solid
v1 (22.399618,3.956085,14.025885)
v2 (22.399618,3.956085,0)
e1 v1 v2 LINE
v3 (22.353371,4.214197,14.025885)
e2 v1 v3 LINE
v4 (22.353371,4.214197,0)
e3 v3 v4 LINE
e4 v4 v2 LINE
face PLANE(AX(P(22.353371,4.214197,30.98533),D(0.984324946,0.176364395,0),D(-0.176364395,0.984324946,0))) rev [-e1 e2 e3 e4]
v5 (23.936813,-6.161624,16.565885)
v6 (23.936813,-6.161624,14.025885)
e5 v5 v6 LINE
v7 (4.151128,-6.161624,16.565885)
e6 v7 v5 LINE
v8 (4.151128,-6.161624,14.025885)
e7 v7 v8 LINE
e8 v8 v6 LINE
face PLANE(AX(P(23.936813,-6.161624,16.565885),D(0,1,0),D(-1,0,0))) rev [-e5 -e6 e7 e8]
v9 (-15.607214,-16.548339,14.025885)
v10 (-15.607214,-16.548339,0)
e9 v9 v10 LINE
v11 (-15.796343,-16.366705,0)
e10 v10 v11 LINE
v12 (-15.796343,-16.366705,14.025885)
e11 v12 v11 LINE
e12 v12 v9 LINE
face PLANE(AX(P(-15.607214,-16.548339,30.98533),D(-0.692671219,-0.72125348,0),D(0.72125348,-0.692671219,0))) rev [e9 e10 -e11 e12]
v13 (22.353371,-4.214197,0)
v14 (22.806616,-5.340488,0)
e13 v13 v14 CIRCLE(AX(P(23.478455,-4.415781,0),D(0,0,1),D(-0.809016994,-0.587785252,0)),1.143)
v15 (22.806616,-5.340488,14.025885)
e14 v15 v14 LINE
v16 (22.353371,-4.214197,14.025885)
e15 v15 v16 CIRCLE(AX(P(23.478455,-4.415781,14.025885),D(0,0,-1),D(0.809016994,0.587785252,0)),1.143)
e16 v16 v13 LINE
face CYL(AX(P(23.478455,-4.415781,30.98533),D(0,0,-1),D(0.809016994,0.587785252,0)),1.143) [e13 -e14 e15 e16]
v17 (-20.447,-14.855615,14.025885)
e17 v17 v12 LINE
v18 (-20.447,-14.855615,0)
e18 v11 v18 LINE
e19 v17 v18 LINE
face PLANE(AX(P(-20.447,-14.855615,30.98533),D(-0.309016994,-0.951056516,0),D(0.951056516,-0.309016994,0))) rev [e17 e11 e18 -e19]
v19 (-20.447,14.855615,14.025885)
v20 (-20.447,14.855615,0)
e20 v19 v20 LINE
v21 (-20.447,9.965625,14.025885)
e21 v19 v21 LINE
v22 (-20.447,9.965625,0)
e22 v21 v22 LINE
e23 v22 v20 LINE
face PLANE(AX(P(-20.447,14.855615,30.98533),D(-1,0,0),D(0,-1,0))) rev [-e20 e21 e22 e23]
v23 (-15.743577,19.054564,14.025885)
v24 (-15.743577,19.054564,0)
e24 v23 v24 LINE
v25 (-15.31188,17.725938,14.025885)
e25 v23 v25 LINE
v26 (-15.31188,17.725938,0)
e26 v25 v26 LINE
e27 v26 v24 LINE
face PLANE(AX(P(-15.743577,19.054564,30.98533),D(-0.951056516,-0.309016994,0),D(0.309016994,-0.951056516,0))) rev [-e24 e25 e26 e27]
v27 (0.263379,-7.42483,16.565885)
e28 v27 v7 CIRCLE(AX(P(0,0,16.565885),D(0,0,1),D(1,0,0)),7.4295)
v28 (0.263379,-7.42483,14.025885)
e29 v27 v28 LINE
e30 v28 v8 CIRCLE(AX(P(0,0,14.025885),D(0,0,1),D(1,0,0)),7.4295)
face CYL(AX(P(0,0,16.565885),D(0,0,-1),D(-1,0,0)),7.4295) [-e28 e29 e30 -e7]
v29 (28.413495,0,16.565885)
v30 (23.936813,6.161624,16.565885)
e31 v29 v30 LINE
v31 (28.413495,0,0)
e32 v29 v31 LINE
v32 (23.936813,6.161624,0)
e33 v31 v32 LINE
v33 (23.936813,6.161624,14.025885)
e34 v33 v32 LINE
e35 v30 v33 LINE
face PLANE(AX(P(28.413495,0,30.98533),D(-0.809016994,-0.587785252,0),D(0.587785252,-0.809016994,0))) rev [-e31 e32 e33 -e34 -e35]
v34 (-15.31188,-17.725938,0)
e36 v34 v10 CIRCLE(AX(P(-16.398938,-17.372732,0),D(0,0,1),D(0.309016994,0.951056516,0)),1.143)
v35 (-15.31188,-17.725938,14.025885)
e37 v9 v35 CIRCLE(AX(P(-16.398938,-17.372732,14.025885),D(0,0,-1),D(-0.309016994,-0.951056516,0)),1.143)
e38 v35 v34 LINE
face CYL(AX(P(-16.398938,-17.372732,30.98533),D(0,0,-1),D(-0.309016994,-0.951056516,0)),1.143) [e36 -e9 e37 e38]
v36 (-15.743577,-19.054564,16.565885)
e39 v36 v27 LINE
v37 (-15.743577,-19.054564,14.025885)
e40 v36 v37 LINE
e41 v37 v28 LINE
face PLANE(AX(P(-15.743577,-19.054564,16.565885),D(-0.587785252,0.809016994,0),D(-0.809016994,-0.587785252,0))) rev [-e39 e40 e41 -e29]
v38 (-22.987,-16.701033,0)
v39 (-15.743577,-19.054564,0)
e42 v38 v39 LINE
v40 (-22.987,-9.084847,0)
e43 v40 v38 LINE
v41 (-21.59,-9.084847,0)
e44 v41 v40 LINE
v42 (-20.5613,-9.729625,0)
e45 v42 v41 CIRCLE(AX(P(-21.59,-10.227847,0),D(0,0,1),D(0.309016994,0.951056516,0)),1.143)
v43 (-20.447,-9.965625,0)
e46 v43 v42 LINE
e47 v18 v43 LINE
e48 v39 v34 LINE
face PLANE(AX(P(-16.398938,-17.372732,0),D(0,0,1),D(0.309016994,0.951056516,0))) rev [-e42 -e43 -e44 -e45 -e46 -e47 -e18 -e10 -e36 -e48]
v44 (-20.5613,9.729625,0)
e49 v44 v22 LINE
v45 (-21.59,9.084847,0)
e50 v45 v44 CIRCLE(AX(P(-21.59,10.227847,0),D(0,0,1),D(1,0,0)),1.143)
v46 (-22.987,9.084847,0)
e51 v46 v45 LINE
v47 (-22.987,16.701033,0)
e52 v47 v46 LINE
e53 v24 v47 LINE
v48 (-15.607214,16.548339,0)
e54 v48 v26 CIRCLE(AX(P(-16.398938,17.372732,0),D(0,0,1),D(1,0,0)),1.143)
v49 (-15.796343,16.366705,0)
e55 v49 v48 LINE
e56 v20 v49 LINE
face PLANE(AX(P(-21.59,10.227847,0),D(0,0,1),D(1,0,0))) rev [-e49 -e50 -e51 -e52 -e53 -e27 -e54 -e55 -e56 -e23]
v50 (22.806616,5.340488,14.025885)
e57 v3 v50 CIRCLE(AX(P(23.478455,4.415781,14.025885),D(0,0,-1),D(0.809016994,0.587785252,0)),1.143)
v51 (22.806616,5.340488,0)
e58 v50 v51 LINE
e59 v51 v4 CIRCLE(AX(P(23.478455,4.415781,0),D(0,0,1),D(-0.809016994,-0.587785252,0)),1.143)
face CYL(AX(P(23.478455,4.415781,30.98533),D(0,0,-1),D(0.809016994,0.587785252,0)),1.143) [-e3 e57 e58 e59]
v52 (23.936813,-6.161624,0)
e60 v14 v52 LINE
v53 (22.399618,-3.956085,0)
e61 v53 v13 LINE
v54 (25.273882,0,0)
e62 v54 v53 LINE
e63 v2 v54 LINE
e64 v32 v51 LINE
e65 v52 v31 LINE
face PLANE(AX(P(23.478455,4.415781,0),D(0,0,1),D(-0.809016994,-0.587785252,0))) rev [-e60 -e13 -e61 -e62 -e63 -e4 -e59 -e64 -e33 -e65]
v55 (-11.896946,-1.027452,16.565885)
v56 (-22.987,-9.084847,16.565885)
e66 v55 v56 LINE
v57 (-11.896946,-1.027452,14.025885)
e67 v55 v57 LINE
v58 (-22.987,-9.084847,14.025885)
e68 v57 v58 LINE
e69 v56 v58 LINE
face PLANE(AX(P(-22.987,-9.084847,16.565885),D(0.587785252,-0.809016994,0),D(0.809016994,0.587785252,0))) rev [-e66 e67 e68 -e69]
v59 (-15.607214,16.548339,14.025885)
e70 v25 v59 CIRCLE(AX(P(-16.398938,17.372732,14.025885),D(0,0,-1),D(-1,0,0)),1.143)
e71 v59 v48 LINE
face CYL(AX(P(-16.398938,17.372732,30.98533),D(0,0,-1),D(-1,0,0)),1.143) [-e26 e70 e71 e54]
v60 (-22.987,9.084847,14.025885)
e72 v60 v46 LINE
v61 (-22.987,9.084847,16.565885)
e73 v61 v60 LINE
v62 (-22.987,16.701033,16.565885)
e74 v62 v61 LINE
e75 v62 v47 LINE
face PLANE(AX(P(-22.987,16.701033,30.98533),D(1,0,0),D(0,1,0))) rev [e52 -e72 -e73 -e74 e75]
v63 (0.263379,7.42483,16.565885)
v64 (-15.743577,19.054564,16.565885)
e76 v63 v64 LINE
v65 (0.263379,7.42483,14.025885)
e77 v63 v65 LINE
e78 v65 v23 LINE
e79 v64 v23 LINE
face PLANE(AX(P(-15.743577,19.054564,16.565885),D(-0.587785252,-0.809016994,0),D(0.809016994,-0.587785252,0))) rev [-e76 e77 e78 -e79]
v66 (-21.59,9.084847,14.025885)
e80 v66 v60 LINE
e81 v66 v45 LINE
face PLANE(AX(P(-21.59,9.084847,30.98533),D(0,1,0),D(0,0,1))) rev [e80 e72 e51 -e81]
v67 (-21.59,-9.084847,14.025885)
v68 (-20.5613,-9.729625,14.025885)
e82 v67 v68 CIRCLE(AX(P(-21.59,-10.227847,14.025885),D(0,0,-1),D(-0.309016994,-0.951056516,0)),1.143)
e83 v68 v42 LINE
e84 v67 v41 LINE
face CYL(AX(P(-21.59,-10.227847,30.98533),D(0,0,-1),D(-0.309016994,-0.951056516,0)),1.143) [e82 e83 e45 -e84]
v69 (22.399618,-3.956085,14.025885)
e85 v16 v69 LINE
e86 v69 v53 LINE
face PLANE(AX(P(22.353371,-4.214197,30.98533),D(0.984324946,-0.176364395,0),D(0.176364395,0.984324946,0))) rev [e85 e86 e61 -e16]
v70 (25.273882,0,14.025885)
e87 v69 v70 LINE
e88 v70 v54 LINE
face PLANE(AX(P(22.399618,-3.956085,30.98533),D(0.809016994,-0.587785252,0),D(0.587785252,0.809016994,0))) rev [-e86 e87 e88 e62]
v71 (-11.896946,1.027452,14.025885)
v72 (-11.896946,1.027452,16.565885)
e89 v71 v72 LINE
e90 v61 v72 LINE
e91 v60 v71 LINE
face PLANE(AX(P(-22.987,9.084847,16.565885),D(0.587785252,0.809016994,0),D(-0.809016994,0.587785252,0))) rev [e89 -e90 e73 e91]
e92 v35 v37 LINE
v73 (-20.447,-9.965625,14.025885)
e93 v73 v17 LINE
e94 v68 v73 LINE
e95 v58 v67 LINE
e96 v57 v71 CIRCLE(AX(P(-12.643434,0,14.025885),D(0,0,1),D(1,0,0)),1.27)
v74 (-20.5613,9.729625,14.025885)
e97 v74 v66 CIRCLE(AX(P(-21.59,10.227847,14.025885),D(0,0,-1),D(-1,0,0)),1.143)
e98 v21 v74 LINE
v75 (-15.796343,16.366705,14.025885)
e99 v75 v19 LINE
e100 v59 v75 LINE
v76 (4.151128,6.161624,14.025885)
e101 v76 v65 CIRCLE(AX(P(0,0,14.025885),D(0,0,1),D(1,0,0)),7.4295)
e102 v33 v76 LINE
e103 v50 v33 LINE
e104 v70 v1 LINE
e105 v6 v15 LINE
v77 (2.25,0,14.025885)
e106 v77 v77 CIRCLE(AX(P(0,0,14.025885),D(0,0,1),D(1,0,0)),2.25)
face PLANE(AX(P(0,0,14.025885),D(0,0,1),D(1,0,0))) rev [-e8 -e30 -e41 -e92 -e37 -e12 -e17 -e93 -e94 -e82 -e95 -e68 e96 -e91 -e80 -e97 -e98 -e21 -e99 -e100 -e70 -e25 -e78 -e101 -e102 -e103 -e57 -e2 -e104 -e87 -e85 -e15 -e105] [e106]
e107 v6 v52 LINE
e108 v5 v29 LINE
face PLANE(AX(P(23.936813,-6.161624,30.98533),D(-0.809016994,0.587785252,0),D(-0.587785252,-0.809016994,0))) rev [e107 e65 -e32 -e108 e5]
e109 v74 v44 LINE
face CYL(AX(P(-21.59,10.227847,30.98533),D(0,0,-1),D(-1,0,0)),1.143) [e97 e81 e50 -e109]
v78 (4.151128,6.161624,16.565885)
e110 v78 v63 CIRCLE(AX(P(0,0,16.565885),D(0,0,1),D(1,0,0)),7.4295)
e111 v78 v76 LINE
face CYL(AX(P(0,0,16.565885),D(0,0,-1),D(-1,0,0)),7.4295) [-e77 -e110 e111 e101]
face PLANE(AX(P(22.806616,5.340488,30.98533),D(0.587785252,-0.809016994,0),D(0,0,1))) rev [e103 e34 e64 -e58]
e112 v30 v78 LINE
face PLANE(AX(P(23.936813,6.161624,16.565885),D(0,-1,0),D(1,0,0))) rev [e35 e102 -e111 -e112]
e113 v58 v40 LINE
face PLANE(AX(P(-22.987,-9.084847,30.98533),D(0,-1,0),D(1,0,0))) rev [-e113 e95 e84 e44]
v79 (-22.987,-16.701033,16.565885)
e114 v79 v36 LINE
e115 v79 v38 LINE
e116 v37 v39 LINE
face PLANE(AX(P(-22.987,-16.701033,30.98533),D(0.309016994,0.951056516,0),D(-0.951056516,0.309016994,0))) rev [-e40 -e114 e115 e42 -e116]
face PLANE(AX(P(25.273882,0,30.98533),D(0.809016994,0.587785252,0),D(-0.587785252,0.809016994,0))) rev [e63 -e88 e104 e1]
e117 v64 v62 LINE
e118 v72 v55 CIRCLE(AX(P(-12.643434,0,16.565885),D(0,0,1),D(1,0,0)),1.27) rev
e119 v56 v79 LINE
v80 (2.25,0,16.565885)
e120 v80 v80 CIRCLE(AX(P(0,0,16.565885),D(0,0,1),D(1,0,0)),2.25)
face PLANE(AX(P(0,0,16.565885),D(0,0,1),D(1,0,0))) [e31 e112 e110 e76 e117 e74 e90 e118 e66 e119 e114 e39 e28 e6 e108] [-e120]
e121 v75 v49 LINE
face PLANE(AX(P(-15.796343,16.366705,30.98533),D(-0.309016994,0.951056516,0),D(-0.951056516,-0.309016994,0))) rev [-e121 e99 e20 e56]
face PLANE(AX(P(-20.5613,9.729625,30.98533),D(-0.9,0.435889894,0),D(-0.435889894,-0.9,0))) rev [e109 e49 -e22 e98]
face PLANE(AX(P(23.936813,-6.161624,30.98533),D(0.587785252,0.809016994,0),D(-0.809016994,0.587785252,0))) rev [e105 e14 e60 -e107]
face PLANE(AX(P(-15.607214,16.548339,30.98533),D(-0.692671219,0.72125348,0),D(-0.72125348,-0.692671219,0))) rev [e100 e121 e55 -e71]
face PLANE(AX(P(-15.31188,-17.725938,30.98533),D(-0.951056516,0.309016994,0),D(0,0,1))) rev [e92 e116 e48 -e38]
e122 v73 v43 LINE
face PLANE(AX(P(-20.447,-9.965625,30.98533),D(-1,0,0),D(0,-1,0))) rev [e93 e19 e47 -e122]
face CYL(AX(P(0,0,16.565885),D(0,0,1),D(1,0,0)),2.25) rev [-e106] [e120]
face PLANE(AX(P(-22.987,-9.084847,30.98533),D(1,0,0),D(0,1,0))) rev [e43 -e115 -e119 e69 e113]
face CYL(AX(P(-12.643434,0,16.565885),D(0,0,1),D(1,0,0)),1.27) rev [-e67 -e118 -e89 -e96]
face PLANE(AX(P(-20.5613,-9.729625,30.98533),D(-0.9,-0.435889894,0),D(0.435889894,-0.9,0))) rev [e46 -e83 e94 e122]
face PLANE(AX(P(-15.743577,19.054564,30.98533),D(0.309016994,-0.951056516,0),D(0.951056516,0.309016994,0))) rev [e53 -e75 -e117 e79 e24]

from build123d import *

# Parameters (mm, degrees)
BOSS_EXTRUDE1_DEPTH  = 14.025885253
BOSS_EXTRUDE2_DEPTH  = 2.54
CIRPATTERN1_START    = 14.025885253
CIRPATTERN1_DEPTH    = 2.54
CIRPATTERN1_2_DEPTH  = 14.025885253
FILLET1_R            = 1.27
M4_CLEARANCE_HOLE1_D = 4.5


# Read off the part's stored shape, not the designer's step: CirPattern1
with BuildPart() as part:
    # Sketch1 → Boss-Extrude1 (new body)
    with BuildSketch(Plane.XY):
        with BuildLine():
            Line((-22.987, 16.701033091), (-22.987, 9.084847245))
            Line((-22.987, 9.084847245), (-21.59, 9.084847245))
            ThreePointArc((-21.59, 9.084847245), (-20.982965782, 9.25936469), (-20.5613, 9.729625096))
            Line((-20.5613, 9.729625096), (-20.447, 9.965625061))
            Line((-20.447, 9.965625061), (-20.447, 14.85561507))
            Line((-20.447, 14.85561507), (-15.796343137, 16.366705085))
            Line((-15.796343137, 16.366705085), (-15.607214475, 16.548338845))
            ThreePointArc((-15.607214475, 16.548338845), (-15.290272145, 17.094685292), (-15.31188008, 17.725937997))
            Line((-15.31188008, 17.725937997), (-15.743576822, 19.05456395))
            Line((-15.743576822, 19.05456395), (-22.987, 16.701033091))
        make_face()
    extrude(amount=BOSS_EXTRUDE1_DEPTH)

    # Sketch2 → Boss-Extrude2 (add)
    with BuildSketch(Plane.XY.offset(14.025885253)):
        with BuildLine():
            Line((-22.987, 9.084847245), (-6.980044584, -2.544886608))
            ThreePointArc((-6.980044584, -2.544886608), (6.01059176, -4.366950532), (0.263378594, 7.424830097))
            Line((0.263378594, 7.424830097), (-15.743576822, 19.05456395))
            Line((-15.743576822, 19.05456395), (-22.987, 16.701033091))
            Line((-22.987, 16.701033091), (-22.987, 9.084847245))
        make_face()
    extrude(amount=BOSS_EXTRUDE2_DEPTH)

    # CirPattern1 outline → CirPattern1 (add)
    with BuildSketch(Plane.XY.offset(CIRPATTERN1_START)):
        with BuildLine():
            Line((-10.482780502, 0), (-22.987, -9.084847245))
            Line((-22.987, -9.084847245), (-22.987, -16.701033091))
            Line((-22.987, -16.701033091), (-15.743576822, -19.05456395))
            Line((-15.743576822, -19.05456395), (0.263378594, -7.424830097))
            ThreePointArc((0.263378594, -7.424830097), (-4.151127873, -6.161623782), (-6.980044584, -2.544886608))
            Line((-6.980044584, -2.544886608), (-10.482780502, 0))
        make_face()
        with BuildLine():
            ThreePointArc((4.151127873, 6.161623782), (7.4295, 0), (4.151127873, -6.161623782))
            Line((4.151127873, -6.161623782), (23.93681288, -6.161623782))
            Line((23.93681288, -6.161623782), (28.413494599, 0))
            Line((28.413494599, 0), (23.93681288, 6.161623782))
            Line((23.93681288, 6.161623782), (4.151127873, 6.161623782))
        make_face()
    extrude(amount=CIRPATTERN1_DEPTH)

    # CirPattern1 2 outline → CirPattern1 2 (add)
    with BuildSketch(Plane.XY):
        with BuildLine():
            Line((-20.447, -14.85561507), (-20.447, -9.965625061))
            Line((-20.447, -9.965625061), (-20.5613, -9.729625096))
            ThreePointArc((-20.5613, -9.729625096), (-20.982965782, -9.25936469), (-21.59, -9.084847245))
            Line((-21.59, -9.084847245), (-22.987, -9.084847245))
            Line((-22.987, -9.084847245), (-22.987, -16.701033091))
            Line((-22.987, -16.701033091), (-15.743576822, -19.05456395))
            Line((-15.743576822, -19.05456395), (-15.31188008, -17.725937997))
            ThreePointArc((-15.31188008, -17.725937997), (-15.290272145, -17.094685292), (-15.607214475, -16.548338845))
            Line((-15.607214475, -16.548338845), (-15.796343137, -16.366705085))
            Line((-15.796343137, -16.366705085), (-20.447, -14.85561507))
        make_face()
        with BuildLine():
            Line((22.806616138, -5.340487785), (23.93681288, -6.161623782))
            Line((23.93681288, -6.161623782), (28.413494599, 0))
            Line((28.413494599, 0), (23.93681288, 6.161623782))
            Line((23.93681288, 6.161623782), (22.806616138, 5.340487785))
            ThreePointArc((22.806616138, 5.340487785), (22.418093921, 4.842494444), (22.353371268, 4.214196857))
            Line((22.353371268, 4.214196857), (22.399617925, 3.95608502))
            Line((22.399617925, 3.95608502), (25.273881936, 0))
            Line((25.273881936, 0), (22.399617925, -3.95608502))
            Line((22.399617925, -3.95608502), (22.353371268, -4.214196857))
            ThreePointArc((22.353371268, -4.214196857), (22.418093921, -4.842494444), (22.806616138, -5.340487785))
        make_face()
    extrude(amount=CIRPATTERN1_2_DEPTH)

    # Fillet1
    fillet1_edges = [part.edges().sort_by_distance(p)[0] for p in [
        (-10.482780502, 0, 15.295885253),
    ]]
    fillet(fillet1_edges, radius=FILLET1_R)

    # M4 Clearance Hole1 (through all)
    with Locations(Plane.XY.offset(16.565885253)):
        with Locations((0, 0)):
            Hole(M4_CLEARANCE_HOLE1_D / 2)


solid = part.part
